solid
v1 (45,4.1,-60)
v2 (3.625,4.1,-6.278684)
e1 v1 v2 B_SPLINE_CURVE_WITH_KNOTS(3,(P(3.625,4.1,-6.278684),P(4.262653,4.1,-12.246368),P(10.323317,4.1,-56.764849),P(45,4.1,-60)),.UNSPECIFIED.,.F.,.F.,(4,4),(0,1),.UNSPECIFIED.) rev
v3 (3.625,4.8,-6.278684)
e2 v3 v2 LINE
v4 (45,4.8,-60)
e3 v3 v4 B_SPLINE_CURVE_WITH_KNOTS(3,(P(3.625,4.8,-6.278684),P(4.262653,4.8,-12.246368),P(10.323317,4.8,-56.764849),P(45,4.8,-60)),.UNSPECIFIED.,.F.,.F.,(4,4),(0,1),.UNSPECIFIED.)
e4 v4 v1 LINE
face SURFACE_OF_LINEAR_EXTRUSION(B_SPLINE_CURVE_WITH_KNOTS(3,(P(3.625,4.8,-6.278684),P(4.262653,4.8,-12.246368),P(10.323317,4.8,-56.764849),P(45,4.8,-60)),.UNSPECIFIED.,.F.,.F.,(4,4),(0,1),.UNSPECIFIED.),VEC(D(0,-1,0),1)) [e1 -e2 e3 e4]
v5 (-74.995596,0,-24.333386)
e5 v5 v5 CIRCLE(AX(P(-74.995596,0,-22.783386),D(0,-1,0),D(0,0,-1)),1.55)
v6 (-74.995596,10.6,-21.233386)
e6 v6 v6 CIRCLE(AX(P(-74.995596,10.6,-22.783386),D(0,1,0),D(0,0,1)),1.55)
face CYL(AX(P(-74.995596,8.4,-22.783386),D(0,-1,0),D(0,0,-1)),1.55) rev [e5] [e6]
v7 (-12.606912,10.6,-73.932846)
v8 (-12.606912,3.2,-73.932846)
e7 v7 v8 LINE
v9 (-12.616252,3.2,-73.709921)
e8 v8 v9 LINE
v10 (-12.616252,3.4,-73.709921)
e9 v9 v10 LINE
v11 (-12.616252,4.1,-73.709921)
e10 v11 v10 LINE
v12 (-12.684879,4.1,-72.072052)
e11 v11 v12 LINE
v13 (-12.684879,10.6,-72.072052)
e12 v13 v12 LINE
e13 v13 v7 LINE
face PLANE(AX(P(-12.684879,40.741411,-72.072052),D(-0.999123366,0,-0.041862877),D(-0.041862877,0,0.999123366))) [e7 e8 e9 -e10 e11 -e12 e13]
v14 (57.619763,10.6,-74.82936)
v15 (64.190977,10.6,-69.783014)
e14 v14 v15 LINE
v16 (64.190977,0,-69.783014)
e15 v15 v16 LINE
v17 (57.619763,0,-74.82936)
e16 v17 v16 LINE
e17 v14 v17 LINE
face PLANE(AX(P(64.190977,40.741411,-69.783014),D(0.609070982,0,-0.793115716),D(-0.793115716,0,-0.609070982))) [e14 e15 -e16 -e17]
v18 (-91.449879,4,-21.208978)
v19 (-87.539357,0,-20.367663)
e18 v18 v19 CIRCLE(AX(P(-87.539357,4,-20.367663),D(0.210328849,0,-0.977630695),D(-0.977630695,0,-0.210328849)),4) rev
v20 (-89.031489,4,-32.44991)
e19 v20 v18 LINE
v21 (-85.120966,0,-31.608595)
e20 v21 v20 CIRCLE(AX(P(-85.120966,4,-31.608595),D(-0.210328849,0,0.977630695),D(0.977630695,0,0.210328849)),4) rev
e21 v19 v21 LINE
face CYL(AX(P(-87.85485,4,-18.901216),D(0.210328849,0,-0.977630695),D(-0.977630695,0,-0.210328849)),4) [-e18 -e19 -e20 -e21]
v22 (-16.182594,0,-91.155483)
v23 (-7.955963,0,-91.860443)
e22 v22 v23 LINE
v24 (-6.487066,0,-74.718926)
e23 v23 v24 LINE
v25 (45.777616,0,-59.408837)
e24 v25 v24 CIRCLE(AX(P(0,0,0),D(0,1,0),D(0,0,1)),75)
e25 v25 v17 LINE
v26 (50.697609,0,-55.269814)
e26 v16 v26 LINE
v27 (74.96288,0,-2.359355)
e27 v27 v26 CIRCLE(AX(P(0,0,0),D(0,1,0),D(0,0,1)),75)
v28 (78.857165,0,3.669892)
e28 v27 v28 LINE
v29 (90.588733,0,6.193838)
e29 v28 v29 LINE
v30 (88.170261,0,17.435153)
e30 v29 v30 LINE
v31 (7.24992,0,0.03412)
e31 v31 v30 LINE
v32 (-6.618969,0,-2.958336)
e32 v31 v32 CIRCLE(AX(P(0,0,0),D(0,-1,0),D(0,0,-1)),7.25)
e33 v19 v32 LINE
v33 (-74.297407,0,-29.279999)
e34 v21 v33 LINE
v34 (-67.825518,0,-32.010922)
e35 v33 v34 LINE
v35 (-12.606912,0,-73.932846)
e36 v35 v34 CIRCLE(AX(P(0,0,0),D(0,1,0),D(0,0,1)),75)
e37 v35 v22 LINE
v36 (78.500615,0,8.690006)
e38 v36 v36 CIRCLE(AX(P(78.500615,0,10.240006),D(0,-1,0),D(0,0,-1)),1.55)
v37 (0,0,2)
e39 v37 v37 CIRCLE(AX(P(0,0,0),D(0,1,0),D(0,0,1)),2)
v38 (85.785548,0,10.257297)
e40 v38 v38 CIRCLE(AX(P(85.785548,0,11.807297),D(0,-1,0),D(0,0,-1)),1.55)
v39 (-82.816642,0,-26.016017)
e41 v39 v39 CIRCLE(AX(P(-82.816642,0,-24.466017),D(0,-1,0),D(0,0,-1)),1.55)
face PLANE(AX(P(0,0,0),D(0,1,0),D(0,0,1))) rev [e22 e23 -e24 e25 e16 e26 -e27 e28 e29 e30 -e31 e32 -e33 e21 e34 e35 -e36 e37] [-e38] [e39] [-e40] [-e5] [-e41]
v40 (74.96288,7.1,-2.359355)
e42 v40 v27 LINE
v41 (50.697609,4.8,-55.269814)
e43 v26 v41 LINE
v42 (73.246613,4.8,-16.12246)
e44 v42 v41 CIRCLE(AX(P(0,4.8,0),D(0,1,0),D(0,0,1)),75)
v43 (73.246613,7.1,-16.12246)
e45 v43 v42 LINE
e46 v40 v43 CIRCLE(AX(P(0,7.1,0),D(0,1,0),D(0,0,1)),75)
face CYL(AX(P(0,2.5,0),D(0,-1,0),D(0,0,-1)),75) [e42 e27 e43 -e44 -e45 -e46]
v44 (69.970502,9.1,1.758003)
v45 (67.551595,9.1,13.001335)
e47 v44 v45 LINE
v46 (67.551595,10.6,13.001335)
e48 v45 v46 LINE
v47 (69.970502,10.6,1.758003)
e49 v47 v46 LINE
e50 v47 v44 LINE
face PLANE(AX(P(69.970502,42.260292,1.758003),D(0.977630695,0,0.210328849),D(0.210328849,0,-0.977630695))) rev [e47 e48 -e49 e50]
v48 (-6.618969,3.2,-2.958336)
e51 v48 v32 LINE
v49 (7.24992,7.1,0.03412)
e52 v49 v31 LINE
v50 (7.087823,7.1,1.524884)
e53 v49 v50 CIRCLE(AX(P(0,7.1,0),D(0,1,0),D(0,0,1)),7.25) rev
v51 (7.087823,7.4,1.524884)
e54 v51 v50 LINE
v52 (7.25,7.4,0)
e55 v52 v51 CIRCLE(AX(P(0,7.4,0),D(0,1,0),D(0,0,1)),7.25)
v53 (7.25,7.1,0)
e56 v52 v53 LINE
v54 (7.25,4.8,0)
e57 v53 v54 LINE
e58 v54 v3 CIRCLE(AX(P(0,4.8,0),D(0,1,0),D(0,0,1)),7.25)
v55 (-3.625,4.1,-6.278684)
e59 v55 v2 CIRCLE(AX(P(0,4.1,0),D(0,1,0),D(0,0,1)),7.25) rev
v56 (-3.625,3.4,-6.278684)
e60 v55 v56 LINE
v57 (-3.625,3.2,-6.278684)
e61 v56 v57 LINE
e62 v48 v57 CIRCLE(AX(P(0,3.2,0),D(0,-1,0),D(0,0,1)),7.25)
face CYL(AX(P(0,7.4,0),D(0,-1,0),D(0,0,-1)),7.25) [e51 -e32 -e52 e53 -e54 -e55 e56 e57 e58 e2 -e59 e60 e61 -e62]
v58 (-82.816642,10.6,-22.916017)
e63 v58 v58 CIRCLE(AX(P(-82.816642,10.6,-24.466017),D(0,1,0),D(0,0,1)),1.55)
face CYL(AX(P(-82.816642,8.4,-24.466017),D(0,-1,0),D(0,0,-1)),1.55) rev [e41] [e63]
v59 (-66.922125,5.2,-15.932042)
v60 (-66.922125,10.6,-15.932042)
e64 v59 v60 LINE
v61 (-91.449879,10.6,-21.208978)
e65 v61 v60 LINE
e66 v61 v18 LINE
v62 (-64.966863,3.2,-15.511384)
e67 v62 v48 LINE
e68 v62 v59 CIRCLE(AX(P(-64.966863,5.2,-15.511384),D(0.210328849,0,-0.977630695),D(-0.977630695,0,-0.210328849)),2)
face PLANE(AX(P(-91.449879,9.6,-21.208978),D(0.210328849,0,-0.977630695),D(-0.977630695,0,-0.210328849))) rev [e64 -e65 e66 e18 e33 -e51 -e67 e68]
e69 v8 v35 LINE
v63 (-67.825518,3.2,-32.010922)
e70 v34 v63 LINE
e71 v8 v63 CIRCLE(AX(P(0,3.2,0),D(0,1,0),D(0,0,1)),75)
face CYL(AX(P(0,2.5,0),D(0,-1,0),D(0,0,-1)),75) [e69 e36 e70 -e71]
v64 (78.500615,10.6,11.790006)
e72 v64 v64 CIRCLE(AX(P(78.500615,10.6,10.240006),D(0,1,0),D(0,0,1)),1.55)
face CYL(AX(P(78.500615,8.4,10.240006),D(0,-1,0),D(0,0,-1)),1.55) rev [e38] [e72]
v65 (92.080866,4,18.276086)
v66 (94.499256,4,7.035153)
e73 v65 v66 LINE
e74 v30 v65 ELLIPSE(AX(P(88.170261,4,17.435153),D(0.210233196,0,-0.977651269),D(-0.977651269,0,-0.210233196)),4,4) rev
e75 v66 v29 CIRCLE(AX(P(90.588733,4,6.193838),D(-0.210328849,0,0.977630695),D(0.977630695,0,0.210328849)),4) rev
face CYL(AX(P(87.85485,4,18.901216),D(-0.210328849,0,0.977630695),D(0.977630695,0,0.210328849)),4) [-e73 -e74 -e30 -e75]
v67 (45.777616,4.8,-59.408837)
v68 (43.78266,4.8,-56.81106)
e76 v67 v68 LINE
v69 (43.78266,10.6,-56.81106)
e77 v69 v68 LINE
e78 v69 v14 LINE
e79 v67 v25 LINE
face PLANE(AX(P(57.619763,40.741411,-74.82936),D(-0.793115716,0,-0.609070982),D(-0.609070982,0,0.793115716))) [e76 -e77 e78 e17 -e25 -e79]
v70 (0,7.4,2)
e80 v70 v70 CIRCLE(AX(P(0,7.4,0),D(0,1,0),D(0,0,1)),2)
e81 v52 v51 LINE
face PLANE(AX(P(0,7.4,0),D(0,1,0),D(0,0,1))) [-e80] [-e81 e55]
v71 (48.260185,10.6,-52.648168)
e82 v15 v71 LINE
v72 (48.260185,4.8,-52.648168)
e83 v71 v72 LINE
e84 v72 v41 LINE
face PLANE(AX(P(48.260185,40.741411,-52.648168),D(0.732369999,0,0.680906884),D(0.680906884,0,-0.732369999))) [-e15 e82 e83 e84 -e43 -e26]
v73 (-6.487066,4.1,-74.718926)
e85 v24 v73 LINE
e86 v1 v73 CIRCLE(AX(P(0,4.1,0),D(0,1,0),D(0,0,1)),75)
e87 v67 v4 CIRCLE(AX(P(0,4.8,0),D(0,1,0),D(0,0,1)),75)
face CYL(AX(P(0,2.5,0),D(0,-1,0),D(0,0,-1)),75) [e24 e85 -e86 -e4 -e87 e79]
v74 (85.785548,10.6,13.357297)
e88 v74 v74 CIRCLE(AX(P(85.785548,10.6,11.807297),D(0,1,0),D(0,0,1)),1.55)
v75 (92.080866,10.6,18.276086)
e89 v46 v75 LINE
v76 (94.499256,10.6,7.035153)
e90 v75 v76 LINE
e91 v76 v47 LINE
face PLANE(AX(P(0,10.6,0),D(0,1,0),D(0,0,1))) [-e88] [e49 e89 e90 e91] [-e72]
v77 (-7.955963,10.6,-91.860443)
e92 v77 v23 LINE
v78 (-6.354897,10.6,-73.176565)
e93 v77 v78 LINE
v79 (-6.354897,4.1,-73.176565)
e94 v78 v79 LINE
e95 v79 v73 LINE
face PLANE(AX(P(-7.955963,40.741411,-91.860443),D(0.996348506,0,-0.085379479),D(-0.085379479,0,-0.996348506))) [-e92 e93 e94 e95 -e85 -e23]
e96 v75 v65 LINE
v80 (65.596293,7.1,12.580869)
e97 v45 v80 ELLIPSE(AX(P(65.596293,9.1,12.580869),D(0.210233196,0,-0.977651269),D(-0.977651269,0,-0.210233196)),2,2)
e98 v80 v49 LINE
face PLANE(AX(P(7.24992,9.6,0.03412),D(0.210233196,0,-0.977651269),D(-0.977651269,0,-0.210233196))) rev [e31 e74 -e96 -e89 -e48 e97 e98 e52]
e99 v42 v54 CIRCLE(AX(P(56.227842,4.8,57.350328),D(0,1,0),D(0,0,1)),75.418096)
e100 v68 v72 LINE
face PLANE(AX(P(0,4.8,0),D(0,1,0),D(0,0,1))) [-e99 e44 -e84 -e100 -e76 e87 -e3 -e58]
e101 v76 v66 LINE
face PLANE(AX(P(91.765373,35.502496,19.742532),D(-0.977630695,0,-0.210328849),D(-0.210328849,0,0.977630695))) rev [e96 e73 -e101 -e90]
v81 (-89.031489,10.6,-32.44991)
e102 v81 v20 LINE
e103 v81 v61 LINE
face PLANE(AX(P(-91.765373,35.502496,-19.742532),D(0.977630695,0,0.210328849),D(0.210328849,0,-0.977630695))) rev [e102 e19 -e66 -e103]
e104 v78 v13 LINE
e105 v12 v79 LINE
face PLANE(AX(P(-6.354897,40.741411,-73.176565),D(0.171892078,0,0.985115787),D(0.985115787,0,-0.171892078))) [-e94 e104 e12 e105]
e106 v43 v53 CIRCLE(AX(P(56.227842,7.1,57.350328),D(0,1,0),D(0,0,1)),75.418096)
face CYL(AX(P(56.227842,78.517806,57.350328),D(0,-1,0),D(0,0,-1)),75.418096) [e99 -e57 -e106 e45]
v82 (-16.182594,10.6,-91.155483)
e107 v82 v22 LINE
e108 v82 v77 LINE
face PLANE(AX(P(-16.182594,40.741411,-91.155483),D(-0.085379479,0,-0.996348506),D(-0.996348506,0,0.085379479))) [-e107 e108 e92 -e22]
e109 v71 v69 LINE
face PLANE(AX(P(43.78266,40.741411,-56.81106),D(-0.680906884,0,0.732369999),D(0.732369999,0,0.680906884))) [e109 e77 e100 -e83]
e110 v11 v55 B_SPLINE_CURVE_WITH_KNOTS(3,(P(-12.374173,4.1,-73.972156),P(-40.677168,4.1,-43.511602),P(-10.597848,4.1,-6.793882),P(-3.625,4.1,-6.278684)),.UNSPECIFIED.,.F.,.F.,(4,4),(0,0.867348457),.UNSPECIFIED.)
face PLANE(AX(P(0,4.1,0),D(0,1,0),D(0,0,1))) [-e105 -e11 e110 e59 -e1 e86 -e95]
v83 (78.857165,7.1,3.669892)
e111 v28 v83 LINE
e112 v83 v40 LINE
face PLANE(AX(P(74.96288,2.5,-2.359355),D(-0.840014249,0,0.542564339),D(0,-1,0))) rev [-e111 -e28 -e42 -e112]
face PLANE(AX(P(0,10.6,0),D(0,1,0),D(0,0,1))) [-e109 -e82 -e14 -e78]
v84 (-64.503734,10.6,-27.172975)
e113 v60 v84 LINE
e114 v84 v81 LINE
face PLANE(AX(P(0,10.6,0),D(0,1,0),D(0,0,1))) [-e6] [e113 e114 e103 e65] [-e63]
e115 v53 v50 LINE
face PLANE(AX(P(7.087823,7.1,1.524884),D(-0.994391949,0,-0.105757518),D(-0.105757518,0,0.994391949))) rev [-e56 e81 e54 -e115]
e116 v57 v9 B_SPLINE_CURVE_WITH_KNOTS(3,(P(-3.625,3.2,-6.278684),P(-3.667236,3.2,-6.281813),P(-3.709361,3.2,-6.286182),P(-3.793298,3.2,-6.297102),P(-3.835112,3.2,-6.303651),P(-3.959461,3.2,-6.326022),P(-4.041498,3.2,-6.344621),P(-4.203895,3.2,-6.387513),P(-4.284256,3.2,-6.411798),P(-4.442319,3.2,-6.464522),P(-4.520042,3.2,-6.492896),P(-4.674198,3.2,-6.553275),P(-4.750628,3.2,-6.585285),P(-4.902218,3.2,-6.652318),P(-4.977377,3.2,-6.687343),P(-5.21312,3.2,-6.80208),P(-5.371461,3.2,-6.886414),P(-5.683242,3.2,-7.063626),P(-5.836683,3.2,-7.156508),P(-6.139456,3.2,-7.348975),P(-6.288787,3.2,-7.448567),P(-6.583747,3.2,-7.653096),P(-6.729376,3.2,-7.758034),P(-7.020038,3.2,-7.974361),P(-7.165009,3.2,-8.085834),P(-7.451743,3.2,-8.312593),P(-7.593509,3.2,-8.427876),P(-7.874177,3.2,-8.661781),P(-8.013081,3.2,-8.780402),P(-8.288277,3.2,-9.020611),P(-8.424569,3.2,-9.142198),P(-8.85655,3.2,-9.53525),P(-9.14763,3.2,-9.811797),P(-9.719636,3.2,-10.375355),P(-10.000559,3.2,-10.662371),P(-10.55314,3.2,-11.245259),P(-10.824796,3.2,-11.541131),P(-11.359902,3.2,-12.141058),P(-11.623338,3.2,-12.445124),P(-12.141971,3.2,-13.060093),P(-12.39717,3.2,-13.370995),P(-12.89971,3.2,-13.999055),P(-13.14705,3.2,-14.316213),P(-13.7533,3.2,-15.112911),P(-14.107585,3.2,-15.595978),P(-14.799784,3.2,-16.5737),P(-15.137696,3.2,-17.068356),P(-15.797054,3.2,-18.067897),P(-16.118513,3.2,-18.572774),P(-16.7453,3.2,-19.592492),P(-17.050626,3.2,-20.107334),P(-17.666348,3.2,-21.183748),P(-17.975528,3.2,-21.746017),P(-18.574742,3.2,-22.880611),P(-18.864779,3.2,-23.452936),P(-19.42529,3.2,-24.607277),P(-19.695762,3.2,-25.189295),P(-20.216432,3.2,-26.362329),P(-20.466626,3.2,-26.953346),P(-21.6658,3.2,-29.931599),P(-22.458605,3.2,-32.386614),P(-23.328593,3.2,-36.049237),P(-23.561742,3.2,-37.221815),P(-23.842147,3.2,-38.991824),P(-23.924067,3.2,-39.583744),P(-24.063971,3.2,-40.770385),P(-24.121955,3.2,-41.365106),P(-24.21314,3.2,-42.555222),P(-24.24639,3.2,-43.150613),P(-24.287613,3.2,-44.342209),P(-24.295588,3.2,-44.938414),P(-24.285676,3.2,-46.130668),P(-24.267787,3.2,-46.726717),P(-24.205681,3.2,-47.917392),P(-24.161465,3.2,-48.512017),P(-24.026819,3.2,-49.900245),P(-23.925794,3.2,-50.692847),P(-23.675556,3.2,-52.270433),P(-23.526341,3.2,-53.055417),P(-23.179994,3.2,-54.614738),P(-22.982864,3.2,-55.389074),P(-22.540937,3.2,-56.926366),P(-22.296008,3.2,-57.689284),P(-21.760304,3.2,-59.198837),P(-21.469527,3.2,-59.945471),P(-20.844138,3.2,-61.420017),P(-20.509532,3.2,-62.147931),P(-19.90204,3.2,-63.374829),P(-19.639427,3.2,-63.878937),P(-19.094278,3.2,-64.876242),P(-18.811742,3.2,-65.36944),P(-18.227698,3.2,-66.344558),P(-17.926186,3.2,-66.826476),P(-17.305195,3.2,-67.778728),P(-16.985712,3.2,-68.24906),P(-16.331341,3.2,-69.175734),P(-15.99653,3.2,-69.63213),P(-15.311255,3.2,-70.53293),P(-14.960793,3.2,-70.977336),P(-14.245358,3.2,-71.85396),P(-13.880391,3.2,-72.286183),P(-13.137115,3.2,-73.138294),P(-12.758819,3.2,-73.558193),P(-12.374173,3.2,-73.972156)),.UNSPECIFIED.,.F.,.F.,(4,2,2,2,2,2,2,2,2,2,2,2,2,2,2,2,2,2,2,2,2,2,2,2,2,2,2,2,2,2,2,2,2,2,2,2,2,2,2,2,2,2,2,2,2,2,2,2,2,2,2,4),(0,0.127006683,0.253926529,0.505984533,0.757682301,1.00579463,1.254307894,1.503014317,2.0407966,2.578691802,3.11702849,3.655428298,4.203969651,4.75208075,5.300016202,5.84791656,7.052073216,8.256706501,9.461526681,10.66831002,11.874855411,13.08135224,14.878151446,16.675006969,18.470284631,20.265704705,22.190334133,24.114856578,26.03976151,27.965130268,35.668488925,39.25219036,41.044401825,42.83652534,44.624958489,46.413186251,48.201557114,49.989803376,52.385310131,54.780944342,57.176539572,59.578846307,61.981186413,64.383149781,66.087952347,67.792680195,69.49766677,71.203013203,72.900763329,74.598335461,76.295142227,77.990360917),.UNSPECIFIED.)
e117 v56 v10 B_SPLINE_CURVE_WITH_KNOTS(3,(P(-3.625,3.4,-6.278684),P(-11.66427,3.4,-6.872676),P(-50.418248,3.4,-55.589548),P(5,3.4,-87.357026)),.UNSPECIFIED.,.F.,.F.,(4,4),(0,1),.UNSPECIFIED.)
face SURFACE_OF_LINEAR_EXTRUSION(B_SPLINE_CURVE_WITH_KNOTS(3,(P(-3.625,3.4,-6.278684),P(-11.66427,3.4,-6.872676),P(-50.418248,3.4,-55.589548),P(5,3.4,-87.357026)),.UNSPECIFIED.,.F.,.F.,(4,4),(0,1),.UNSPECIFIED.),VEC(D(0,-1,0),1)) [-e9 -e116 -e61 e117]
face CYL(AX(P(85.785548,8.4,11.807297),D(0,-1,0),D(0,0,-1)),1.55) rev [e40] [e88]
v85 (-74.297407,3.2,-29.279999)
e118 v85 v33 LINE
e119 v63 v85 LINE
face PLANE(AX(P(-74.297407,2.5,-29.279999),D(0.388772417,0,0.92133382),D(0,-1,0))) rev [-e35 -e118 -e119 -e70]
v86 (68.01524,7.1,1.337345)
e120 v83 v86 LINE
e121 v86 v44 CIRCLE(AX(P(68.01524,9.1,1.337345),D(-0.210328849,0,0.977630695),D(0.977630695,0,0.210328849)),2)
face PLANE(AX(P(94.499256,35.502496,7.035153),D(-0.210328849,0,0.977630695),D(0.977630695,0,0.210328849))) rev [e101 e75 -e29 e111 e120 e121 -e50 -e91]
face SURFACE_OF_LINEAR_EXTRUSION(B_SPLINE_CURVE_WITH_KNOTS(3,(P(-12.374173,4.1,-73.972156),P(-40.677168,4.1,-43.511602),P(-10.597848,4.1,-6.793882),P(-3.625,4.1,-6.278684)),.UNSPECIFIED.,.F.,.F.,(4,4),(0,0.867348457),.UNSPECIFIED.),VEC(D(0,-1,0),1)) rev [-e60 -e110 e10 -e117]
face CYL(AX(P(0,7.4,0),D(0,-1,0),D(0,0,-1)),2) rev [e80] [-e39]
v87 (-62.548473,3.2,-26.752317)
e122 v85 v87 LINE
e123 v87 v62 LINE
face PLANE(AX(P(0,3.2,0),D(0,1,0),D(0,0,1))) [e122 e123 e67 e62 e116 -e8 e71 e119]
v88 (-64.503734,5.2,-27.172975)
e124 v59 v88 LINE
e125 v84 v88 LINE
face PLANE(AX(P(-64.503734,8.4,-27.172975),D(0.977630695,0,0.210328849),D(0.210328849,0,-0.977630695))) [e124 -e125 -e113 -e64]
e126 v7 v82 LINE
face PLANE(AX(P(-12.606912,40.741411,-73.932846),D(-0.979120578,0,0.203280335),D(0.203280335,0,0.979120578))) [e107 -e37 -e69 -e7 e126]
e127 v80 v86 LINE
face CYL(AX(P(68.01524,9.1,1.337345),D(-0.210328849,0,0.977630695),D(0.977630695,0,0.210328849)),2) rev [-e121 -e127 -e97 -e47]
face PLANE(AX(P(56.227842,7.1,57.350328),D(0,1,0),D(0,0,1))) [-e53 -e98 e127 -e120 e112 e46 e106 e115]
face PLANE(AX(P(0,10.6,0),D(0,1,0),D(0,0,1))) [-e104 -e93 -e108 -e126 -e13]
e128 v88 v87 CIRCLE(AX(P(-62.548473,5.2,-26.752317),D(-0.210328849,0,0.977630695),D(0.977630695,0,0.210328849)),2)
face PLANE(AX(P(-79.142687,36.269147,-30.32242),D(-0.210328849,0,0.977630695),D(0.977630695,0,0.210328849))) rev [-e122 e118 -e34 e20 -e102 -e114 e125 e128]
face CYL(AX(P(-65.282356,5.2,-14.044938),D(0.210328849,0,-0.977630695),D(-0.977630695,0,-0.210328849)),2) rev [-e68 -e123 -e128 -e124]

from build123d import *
from build123d.topology import SkipClean

# Parameters (mm, degrees)
SKETCH1_R            = 7.25
SKETCH1_R_2          = 2
BOSS_EXTRUDE1_DEPTH  = 7.4
BOSS_EXTRUDE3_START  = -7.4
BOSS_EXTRUDE3_DEPTH  = 2.5
BOSS_EXTRUDE4_DEPTH  = 0.9
BOSS_EXTRUDE5_DEPTH  = 0.7
BOSS_EXTRUDE6_DEPTH  = 8.4
BOSS_EXTRUDE7_START  = -2.5
BOSS_EXTRUDE7_DEPTH  = 8.4
BOSS_EXTRUDE8_START  = -4.1
BOSS_EXTRUDE8_DEPTH  = 8.4
CUT_EXTRUDE1_DEPTH   = 5
BOSS_EXTRUDE9_START  = 5
SKETCH10_R           = 7.25
SKETCH10_R_2         = 2
BOSS_EXTRUDE9_DEPTH  = 5
BOSS_EXTRUDE10_REACH = 122.721
CUT_EXTRUDE2_DEPTH   = 121.788738675
CUT_EXTRUDE3_START   = -1.3
CUT_EXTRUDE3_DEPTH   = 1.3
SKETCH17_R           = 1.55
CUT_EXTRUDE4_DEPTH   = 121.936633783
SKETCH18_R           = 1.55
BOSS_EXTRUDE11_DEPTH = 1.2
SKETCH19_R           = 1.55
BOSS_EXTRUDE12_DEPTH = 2.5
CUT_EXTRUDE5_DEPTH   = 122.0259038
SKETCH21_R           = 1.55
BOSS_EXTRUDE13_DEPTH = 1
BOSS_EXTRUDE14_DEPTH = 0.7
BOSS_EXTRUDE16_DEPTH = 0.7
BOSS_EXTRUDE17_DEPTH = 1.4
FILLET1_R            = 2
FILLET2_R            = 4
CHAMFER1_SIZE        = 4
CHAMFER1_SIZE_2      = 4.928784719
BOSS_EXTRUDE18_DEPTH = 10.6


with BuildPart() as part:
    # Sketch1 → Boss-Extrude1 (new body)
    with BuildSketch(Plane(origin=(0, 0, 0), x_dir=(1, 0, 0), z_dir=(0, 1, 0))):
        with Locations(Location((0, 0, 0), (0, 0, 270))):
            Circle(SKETCH1_R)
        with Locations(Location((0, 0, 0), (0, 0, 270))):
            Circle(SKETCH1_R_2, mode=Mode.SUBTRACT)
    extrude(amount=BOSS_EXTRUDE1_DEPTH)

    # Sketch2 → Boss-Extrude3 (add)
    with BuildSketch(Plane(origin=(0, 7.4, 0), x_dir=(1, 0, 0), z_dir=(0, 1, 0)).offset(BOSS_EXTRUDE3_START)):
        with BuildLine():
            add(Edge.make_bspline(
                [(-5.126524164, -5.126524164), (-34.917072205, -19.205568344), (-61.161686636, -4.675863942), (-71.850724271, 21.505195227)],
                knots=[0, 0, 0, 0, 0.672240243, 0.672240243, 0.672240243, 0.672240243], degree=3))
            ThreePointArc((-5.126524164, -5.126524164), (-2.774454885, 6.698126611), (7.25, 0))
            Line((7.25, 0), (75, 0))
            ThreePointArc((75, 0), (38.729833462, 64.226162893), (-35, 66.332495807))
            ThreePointArc((-35, 66.332495807), (-57.936525945, 47.62729219), (-71.850724271, 21.505195227))
        make_face()
    extrude(amount=BOSS_EXTRUDE3_DEPTH)

    # Sketch3 → Boss-Extrude4 (add)
    with BuildSketch(Plane(origin=(0, 2.5, 0), x_dir=(1, 0, 0), z_dir=(0, 1, 0))):
        with BuildLine():
            add(Edge.make_bspline(
                [(-3.625, 6.278684177), (-10.597848388, 6.793882103), (-40.677167551, 43.511602441), (-12.374173258, 73.972155817)],
                knots=[0, 0, 0, 0, 0.867348457, 0.867348457, 0.867348457, 0.867348457], degree=3))
            ThreePointArc((-3.625, 6.278684177), (3.625, 6.278684177), (7.25, 0))
            Line((7.25, 0), (75, 0))
            ThreePointArc((75, 0), (48.460999812, 57.2409949), (-12.374173258, 73.972155817))
        make_face()
    extrude(amount=BOSS_EXTRUDE4_DEPTH)



with BuildPart() as body_2:
    # Sketch4 → Boss-Extrude5 (new body)
    with BuildSketch(Plane(origin=(0, 3.4, 0), x_dir=(1, 0, 0), z_dir=(0, 1, 0))):
        with BuildLine():
            Line((7.25, 0), (75, 0))
            ThreePointArc((75, 0), (67.082039325, 33.541019662), (45, 60))
            add(Edge.make_bspline(
                [(3.625, 6.278684177), (4.262653192, 12.246368212), (10.323317408, 56.764848912), (45, 60)],
                knots=[0, 0, 0, 0, 1, 1, 1, 1], degree=3))
            ThreePointArc((3.625, 6.278684177), (6.278684177, 3.625), (7.25, 0))
        make_face()
    extrude(amount=BOSS_EXTRUDE5_DEPTH)


with BuildPart() as part_1:
    with SkipClean():  # the faces are left unmerged after this step: merging them gives an invalid solid
        add(part.part)

        add(body_2.part)  # Boss-Extrude6 merges body 2
        # Sketch6 → Boss-Extrude6 (add)
        with BuildSketch(Plane(origin=(0, 0, 0), x_dir=(-1, 0, 0), z_dir=(0, -1, 0))):
            with BuildLine():
                ThreePointArc((-75, 0), (-74.579396143, -7.931813846), (-73.32230211, -15.774663651))
                Line((-73.32230211, -15.774663651), (-7.087822537, -1.524884153))
                ThreePointArc((-7.087822537, -1.524884153), (-7.209341627, -0.766742005), (-7.25, 0))
                Line((-7.25, 0), (-75, 0))
            make_face()
        extrude(amount=-BOSS_EXTRUDE6_DEPTH)

    # Sketch7 → Boss-Extrude7 (add)
    with BuildSketch(Plane(origin=(0, 2.5, 0), x_dir=(1, 0, 0), z_dir=(0, 1, 0)).offset(BOSS_EXTRUDE7_START)):
        with BuildLine():
            Line((-63.545995162, 13.671375165), (-81.876570689, 17.615041077))
            Line((-81.876570689, 17.615041077), (-79.142687321, 30.32241961))
            Line((-79.142687321, 30.32241961), (-59.52859355, 26.102615769))
            ThreePointArc((-59.52859355, 26.102615769), (-61.850404464, 19.9881832), (-63.545995162, 13.671375165))
        make_face()
    extrude(amount=BOSS_EXTRUDE7_DEPTH)

    # Sketch8 → Boss-Extrude8 (add)
    with SkipClean():  # the faces are left unmerged after this step: merging them gives an invalid solid
        with BuildSketch(Plane(origin=(0, 4.1, 0), x_dir=(1, 0, 0), z_dir=(0, 1, 0)).offset(BOSS_EXTRUDE8_START)):
            Polygon((-79.142687321, 30.32241961), (-81.876570689, 17.615041077), (-91.765372585, 19.742531886), (-89.031489217, 32.449910419), align=None)
            with BuildLine():
                Line((73.32230211, -15.774663651), (91.765372585, -19.742531886))
                Line((91.765372585, -19.742531886), (94.499255953, -7.035153354))
                Line((94.499255953, -7.035153354), (74.946642057, -2.82857638))
                ThreePointArc((74.946642057, -2.82857638), (74.416532068, -9.33700996), (73.32230211, -15.774663651))
            make_face()
        extrude(amount=BOSS_EXTRUDE8_DEPTH)

    # Sketch9 → Cut-Extrude1 (cut)
    with BuildSketch(Plane.XZ):
        Polygon((-91.765372585, -19.742531886), (91.765372585, 19.742531886), (87.979453309, 37.339884393), (-95.551291862, -2.14517938), align=None)
    extrude(amount=-CUT_EXTRUDE1_DEPTH, mode=Mode.SUBTRACT)

    # Sketch10 → Boss-Extrude9 (add)
    with BuildSketch(Plane.XZ.offset(-5).offset(BOSS_EXTRUDE9_START)):
        Circle(SKETCH10_R)
        with Locations(Location((0, 0, 0), (0, 0, 90))):
            Circle(SKETCH10_R_2, mode=Mode.SUBTRACT)
    extrude(amount=-BOSS_EXTRUDE9_DEPTH)

    # Boss-Extrude10: up to this face of the body (flat: up to its plane)
    boss_extrude10_end = Plane(part_1.part.faces().sort_by_distance((60.073544854, 8.4, 7.102164941))[0])
    # Sketch12 → Boss-Extrude10 (add, up to the picked face)
    with BuildSketch(Plane(origin=(0, 4.1, 0), x_dir=(1, 0, 0), z_dir=(0, 1, 0)), mode=Mode.PRIVATE) as boss_extrude10_sk1:
        with BuildLine():
            Line((7.25, 0), (75, 0))
            ThreePointArc((75, 0), (74.56036467, 8.108761945), (73.246612793, 16.122459937))
            ThreePointArc((73.246612793, 16.122459937), (38.330105093, 15.91330646), (7.25, 0))
        make_face()
    boss_extrude10_tool1 = split(extrude(boss_extrude10_sk1.sketch, amount=BOSS_EXTRUDE10_REACH, mode=Mode.PRIVATE), bisect_by=boss_extrude10_end, keep=Keep.BOTH, mode=Mode.PRIVATE)
    add(boss_extrude10_tool1.solids().sort_by(Axis((46.982662, 4.1, -7.736412), (0, 1, 0)))[0])

    # Sketch13 → Cut-Extrude2 (cut, through all)
    with SkipClean():  # the faces are left unmerged after this step: merging them gives an invalid solid
        with BuildSketch(Plane(origin=(0, 2.5, 0), x_dir=(1, 0, 0), z_dir=(0, 1, 0))):
            Polygon((-59.52859355, 26.102615769), (-61.850404464, 19.9881832), (-63.545995162, 13.671375165), (-67.237617804, 14.465596075), (-64.503734436, 27.172974607), align=None)
        extrude(amount=CUT_EXTRUDE2_DEPTH, mode=Mode.SUBTRACT)

    # Sketch16 → Cut-Extrude3 (cut)
    with SkipClean():  # the faces are left unmerged after this step: merging them gives an invalid solid
        with BuildSketch(Plane(origin=(0, 8.4, 0), x_dir=(1, 0, 0), z_dir=(0, 1, 0)).offset(CUT_EXTRUDE3_START)):
            with BuildLine():
                Line((7.087822537, -1.524884153), (7.25, 0))
                ThreePointArc((7.25, 0), (38.330105093, 15.91330646), (73.246612793, 16.122459937))
                ThreePointArc((73.246612793, 16.122459937), (74.809258318, 6.710869331), (74.946642057, -2.82857638))
                Line((74.946642057, -2.82857638), (94.499255953, -7.035153354))
                Line((94.499255953, -7.035153354), (91.765372585, -19.742531886))
                Line((91.765372585, -19.742531886), (7.087822537, -1.524884153))
            make_face()
        extrude(amount=CUT_EXTRUDE3_DEPTH, mode=Mode.SUBTRACT)

    # Sketch17 → Cut-Extrude4 (cut, through all)
    with SkipClean():  # the faces are left unmerged after this step: merging them gives an invalid solid
        with BuildSketch(Plane.XZ):
            with Locations(Location((-82.816641613, -24.466016677, 0), (0, 0, 270))):
                Circle(SKETCH17_R)
            with Locations(Location((-74.995596054, -22.783385887, 0), (0, 0, 270))):
                Circle(SKETCH17_R)
            with Locations(Location((78.500615114, 10.240005813, 0), (0, 0, 270))):
                Circle(SKETCH17_R)
            with Locations(Location((85.785548012, 11.807296568, 0), (0, 0, 270))):
                Circle(SKETCH17_R)
        extrude(amount=-CUT_EXTRUDE4_DEPTH, mode=Mode.SUBTRACT)

    # Sketch18 → Boss-Extrude11 (add)
    with SkipClean():  # the faces are left unmerged after this step: merging them gives an invalid solid
        with BuildSketch(Plane(origin=(0, 8.4, 0), x_dir=(1, 0, 0), z_dir=(0, 1, 0))):
            Polygon((-89.031489217, 32.449910419), (-64.503734436, 27.172974607), (-67.237617804, 14.465596075), (-91.765372585, 19.742531886), align=None)
            with Locations(Location((-82.816641613, 24.466016677, 0), (0, 0, 90))):
                Circle(SKETCH18_R, mode=Mode.SUBTRACT)
            with Locations(Location((-74.995596054, 22.783385887, 0), (0, 0, 90))):
                Circle(SKETCH18_R, mode=Mode.SUBTRACT)
        extrude(amount=BOSS_EXTRUDE11_DEPTH)

    # Sketch19 → Boss-Extrude12 (add)
    with SkipClean():  # the faces are left unmerged after this step: merging them gives an invalid solid
        with BuildSketch(Plane(origin=(0, 7.1, 0), x_dir=(1, 0, 0), z_dir=(0, 1, 0))):
            Polygon((91.765372585, -19.742531886), (94.499255953, -7.035153354), (69.970501821, -1.758002541), (67.236618453, -14.465381073), align=None)
            with Locations(Location((78.500615114, -10.240005813, 0), (0, 0, 90))):
                Circle(SKETCH19_R, mode=Mode.SUBTRACT)
            with Locations(Location((85.785548012, -11.807296568, 0), (0, 0, 90))):
                Circle(SKETCH19_R, mode=Mode.SUBTRACT)
        extrude(amount=BOSS_EXTRUDE12_DEPTH)

    # Sketch20 → Cut-Extrude5 (cut, through all)
    with SkipClean():  # the faces are left unmerged after this step: merging them gives an invalid solid
        with BuildSketch(Plane.XZ):
            with BuildLine():
                Line((7.249919711, 0.034120129), (92.080865858, 18.276085844))
                Line((92.080865858, 18.276085844), (91.765372585, 19.742531886))
                Line((91.765372585, 19.742531886), (7.087822537, 1.524884153))
                ThreePointArc((7.087822537, 1.524884153), (7.207517432, 0.78370432), (7.249919711, 0.034120129))
            make_face()
            with BuildLine():
                Line((-7.087822537, -1.524884153), (-91.765372585, -19.742531886))
                Line((-91.765372585, -19.742531886), (-91.449879312, -21.208977929))
                Line((-91.449879312, -21.208977929), (-6.618968806, -2.95833601))
                ThreePointArc((-6.618968806, -2.95833601), (-6.89077124, -2.25383489), (-7.087822537, -1.524884153))
            make_face()
        extrude(amount=-CUT_EXTRUDE5_DEPTH, mode=Mode.SUBTRACT)

    # Sketch21 → Boss-Extrude13 (add)
    # profile 1 of 2: a face of its own
    with SkipClean():  # the faces are left unmerged after this step: merging them gives an invalid solid
        with BuildSketch(Plane(origin=(0, 9.6, 0), x_dir=(1, 0, 0), z_dir=(0, 1, 0))):
            Polygon((69.970501821, -1.758002541), (67.551595408, -13.001334932), (92.080865858, -18.276085844), (94.499255953, -7.035153354), align=None)
            with Locations(Location((85.785548012, -11.807296568, 0), (0, 0, 90))):
                Circle(SKETCH21_R, mode=Mode.SUBTRACT)
            with Locations(Location((78.500615114, -10.240005813, 0), (0, 0, 90))):
                Circle(SKETCH21_R, mode=Mode.SUBTRACT)
        # profile 2 of 2: a face of its own
        with BuildSketch(Plane(origin=(0, 9.6, 0), x_dir=(1, 0, 0), z_dir=(0, 1, 0))):
            Polygon((-89.031489217, 32.449910419), (-91.449879312, 21.208977929), (-66.922124531, 15.932042117), (-64.503734436, 27.172974607), align=None)
            with Locations(Location((-74.995596054, 22.783385887, 0), (0, 0, 90))):
                Circle(SKETCH21_R, mode=Mode.SUBTRACT)
            with Locations(Location((-82.816641613, 24.466016677, 0), (0, 0, 90))):
                Circle(SKETCH21_R, mode=Mode.SUBTRACT)
        extrude(amount=BOSS_EXTRUDE13_DEPTH)

    # Sketch22 → Boss-Extrude14 (add)
    with SkipClean():  # the faces are left unmerged after this step: merging them gives an invalid solid
        with BuildSketch(Plane(origin=(0, 2.5, 0), x_dir=(1, 0, 0), z_dir=(0, 1, 0))):
            with BuildLine():
                Line((-66.922124531, 15.932042117), (-6.618968806, 2.95833601))
                ThreePointArc((-6.618968806, 2.95833601), (-5.384320033, 4.855058989), (-3.625, 6.278684177))
                add(Edge.make_bspline(
                    [(-3.625, 6.278684177), (-10.597848388, 6.793882103), (-40.677167551, 43.511602441), (-12.374173258, 73.972155817)],
                    knots=[0, 0, 0, 0, 0.867348457, 0.867348457, 0.867348457, 0.867348457], degree=3))
                ThreePointArc((-12.374173258, 73.972155817), (-46.880291054, 58.542619609), (-69.478875321, 28.243333445))
                Line((-69.478875321, 28.243333445), (-64.503734436, 27.172974607))
                Line((-64.503734436, 27.172974607), (-66.922124531, 15.932042117))
            make_face()
        extrude(amount=BOSS_EXTRUDE14_DEPTH)

    # Sketch23 → Boss-Extrude16 (add)
    with SkipClean():  # the faces are left unmerged after this step: merging them gives an invalid solid
        with BuildSketch(Plane(origin=(0, 3.4, 0), x_dir=(1, 0, 0), z_dir=(0, 1, 0))):
            with BuildLine():
                ThreePointArc((45, 60), (17.745884796, 72.870320246), (-12.374173258, 73.972155817))
                add(Edge.make_bspline(
                    [(-12.374173258, 73.972155817), (-40.677167551, 43.511602441), (-10.597848388, 6.793882103), (-3.625, 6.278684177)],
                    knots=[0, 0, 0, 0, 0.867348457, 0.867348457, 0.867348457, 0.867348457], degree=3))
                ThreePointArc((-3.625, 6.278684177), (0, 7.25), (3.625, 6.278684177))
                add(Edge.make_bspline(
                    [(3.625, 6.278684177), (4.262653192, 12.246368212), (10.323317408, 56.764848912), (45, 60)],
                    knots=[0, 0, 0, 0, 1, 1, 1, 1], degree=3))
            make_face()
        extrude(amount=BOSS_EXTRUDE16_DEPTH)

    # Sketch23<4> → Boss-Extrude17 (add)
    with SkipClean():  # the faces are left unmerged after this step: merging them gives an invalid solid
        with BuildSketch(Plane(origin=(0, 3.4, 0), x_dir=(1, 0, 0), z_dir=(0, 1, 0))):
            with BuildLine():
                ThreePointArc((73.246612793, 16.122459937), (38.330105093, 15.91330646), (7.25, 0))
                ThreePointArc((7.25, 0), (6.278684177, 3.625), (3.625, 6.278684177))
                add(Edge.make_bspline(
                    [(3.625, 6.278684177), (4.262653192, 12.246368212), (10.323317408, 56.764848912), (45, 60)],
                    knots=[0, 0, 0, 0, 1, 1, 1, 1], degree=3))
                ThreePointArc((45, 60), (63.062468947, 40.597105935), (73.246612793, 16.122459937))
            make_face()
        extrude(amount=BOSS_EXTRUDE17_DEPTH)

    # Fillet1
    fillet1_edges = [part_1.edges().sort_by_distance(p)[0] for p in [
        (68.761048614, 7.1, 7.379668736),
        (-65.712929483, 3.2, -21.552508362),
    ]]
    fillet(fillet1_edges, radius=FILLET1_R)

    # Fillet2
    fillet2_edges = [part_1.edges().sort_by_distance(p)[0] for p in [
        (-90.240684265, 0, -26.829444174),
        (93.290060906, 0, 12.655619599),
    ]]
    fillet(fillet2_edges, radius=FILLET2_R)

    # Chamfer1
    # the kernel refuses this chamfer: 4.928784719, 4 mm, written as the material it adds along each edge
    with BuildSketch(Plane(origin=(74.946642057, 0, 2.82857638), x_dir=(0.003130013982796916, 0, -0.9999951014942361), z_dir=(0, 1, 0))) as chamfer1_piece_1:
        with BuildLine():
            Line((5.187956974, 0), (-CHAMFER1_SIZE * 0.207267820644, -CHAMFER1_SIZE * 0.978284238105))
            Line((-CHAMFER1_SIZE * 0.207267820644, -CHAMFER1_SIZE * 0.978284238105), (0, 0))
            ThreePointArc((0, 0), (2.676724413, -0.04482594), (5.187956974, 0))
        make_face()
    extrude(amount=7.1)
    with BuildSketch(Plane(origin=(-69.478875321, 2.5, -28.243333445), x_dir=(-0.977630694797596, 0, -0.21032884868598029), z_dir=(0, -1, 0))) as chamfer1_piece_2:
        with BuildLine():
            Line((CHAMFER1_SIZE_2, 0), (-0.823940493, 4.031059203))
            ThreePointArc((-0.823940493, 4.031059203), (-0.398710918, 2.091402767), (0, 0))
            Line((0, 0), (CHAMFER1_SIZE_2, 0))
        make_face()
    extrude(amount=2.5)
    with BuildSketch(Plane(origin=(-69.478875321, 2.5, -28.243333445), x_dir=(-0.9776306947975952, 0, -0.21032884868598303), z_dir=(0, 1, 0))) as chamfer1_piece_3:
        with BuildLine():
            Line((CHAMFER1_SIZE_2, 0), (-0.823940493, -4.031059203))
            ThreePointArc((-0.823940493, -4.031059203), (-0.398710918, -2.091402767), (0, 0))
            Line((0, 0), (CHAMFER1_SIZE_2, 0))
        make_face()
    extrude(amount=0.7)

    # Sketch25 → Boss-Extrude18 (add)
    with SkipClean():  # the faces are left unmerged after this step: merging them gives an invalid solid
        with BuildSketch(Plane.XZ):
            Polygon((-12.606911977, -73.932846357), (-16.182593512, -91.155483124), (-7.955963317, -91.860442679), (-6.354897298, -73.176565057), (-12.684878546, -72.072051611), align=None)
            Polygon((48.260184635, -52.648168475), (64.190977024, -69.783014191), (57.619762564, -74.829359836), (43.782660257, -56.811060424), align=None)
        extrude(amount=-BOSS_EXTRUDE18_DEPTH)


solid = part_1.part
